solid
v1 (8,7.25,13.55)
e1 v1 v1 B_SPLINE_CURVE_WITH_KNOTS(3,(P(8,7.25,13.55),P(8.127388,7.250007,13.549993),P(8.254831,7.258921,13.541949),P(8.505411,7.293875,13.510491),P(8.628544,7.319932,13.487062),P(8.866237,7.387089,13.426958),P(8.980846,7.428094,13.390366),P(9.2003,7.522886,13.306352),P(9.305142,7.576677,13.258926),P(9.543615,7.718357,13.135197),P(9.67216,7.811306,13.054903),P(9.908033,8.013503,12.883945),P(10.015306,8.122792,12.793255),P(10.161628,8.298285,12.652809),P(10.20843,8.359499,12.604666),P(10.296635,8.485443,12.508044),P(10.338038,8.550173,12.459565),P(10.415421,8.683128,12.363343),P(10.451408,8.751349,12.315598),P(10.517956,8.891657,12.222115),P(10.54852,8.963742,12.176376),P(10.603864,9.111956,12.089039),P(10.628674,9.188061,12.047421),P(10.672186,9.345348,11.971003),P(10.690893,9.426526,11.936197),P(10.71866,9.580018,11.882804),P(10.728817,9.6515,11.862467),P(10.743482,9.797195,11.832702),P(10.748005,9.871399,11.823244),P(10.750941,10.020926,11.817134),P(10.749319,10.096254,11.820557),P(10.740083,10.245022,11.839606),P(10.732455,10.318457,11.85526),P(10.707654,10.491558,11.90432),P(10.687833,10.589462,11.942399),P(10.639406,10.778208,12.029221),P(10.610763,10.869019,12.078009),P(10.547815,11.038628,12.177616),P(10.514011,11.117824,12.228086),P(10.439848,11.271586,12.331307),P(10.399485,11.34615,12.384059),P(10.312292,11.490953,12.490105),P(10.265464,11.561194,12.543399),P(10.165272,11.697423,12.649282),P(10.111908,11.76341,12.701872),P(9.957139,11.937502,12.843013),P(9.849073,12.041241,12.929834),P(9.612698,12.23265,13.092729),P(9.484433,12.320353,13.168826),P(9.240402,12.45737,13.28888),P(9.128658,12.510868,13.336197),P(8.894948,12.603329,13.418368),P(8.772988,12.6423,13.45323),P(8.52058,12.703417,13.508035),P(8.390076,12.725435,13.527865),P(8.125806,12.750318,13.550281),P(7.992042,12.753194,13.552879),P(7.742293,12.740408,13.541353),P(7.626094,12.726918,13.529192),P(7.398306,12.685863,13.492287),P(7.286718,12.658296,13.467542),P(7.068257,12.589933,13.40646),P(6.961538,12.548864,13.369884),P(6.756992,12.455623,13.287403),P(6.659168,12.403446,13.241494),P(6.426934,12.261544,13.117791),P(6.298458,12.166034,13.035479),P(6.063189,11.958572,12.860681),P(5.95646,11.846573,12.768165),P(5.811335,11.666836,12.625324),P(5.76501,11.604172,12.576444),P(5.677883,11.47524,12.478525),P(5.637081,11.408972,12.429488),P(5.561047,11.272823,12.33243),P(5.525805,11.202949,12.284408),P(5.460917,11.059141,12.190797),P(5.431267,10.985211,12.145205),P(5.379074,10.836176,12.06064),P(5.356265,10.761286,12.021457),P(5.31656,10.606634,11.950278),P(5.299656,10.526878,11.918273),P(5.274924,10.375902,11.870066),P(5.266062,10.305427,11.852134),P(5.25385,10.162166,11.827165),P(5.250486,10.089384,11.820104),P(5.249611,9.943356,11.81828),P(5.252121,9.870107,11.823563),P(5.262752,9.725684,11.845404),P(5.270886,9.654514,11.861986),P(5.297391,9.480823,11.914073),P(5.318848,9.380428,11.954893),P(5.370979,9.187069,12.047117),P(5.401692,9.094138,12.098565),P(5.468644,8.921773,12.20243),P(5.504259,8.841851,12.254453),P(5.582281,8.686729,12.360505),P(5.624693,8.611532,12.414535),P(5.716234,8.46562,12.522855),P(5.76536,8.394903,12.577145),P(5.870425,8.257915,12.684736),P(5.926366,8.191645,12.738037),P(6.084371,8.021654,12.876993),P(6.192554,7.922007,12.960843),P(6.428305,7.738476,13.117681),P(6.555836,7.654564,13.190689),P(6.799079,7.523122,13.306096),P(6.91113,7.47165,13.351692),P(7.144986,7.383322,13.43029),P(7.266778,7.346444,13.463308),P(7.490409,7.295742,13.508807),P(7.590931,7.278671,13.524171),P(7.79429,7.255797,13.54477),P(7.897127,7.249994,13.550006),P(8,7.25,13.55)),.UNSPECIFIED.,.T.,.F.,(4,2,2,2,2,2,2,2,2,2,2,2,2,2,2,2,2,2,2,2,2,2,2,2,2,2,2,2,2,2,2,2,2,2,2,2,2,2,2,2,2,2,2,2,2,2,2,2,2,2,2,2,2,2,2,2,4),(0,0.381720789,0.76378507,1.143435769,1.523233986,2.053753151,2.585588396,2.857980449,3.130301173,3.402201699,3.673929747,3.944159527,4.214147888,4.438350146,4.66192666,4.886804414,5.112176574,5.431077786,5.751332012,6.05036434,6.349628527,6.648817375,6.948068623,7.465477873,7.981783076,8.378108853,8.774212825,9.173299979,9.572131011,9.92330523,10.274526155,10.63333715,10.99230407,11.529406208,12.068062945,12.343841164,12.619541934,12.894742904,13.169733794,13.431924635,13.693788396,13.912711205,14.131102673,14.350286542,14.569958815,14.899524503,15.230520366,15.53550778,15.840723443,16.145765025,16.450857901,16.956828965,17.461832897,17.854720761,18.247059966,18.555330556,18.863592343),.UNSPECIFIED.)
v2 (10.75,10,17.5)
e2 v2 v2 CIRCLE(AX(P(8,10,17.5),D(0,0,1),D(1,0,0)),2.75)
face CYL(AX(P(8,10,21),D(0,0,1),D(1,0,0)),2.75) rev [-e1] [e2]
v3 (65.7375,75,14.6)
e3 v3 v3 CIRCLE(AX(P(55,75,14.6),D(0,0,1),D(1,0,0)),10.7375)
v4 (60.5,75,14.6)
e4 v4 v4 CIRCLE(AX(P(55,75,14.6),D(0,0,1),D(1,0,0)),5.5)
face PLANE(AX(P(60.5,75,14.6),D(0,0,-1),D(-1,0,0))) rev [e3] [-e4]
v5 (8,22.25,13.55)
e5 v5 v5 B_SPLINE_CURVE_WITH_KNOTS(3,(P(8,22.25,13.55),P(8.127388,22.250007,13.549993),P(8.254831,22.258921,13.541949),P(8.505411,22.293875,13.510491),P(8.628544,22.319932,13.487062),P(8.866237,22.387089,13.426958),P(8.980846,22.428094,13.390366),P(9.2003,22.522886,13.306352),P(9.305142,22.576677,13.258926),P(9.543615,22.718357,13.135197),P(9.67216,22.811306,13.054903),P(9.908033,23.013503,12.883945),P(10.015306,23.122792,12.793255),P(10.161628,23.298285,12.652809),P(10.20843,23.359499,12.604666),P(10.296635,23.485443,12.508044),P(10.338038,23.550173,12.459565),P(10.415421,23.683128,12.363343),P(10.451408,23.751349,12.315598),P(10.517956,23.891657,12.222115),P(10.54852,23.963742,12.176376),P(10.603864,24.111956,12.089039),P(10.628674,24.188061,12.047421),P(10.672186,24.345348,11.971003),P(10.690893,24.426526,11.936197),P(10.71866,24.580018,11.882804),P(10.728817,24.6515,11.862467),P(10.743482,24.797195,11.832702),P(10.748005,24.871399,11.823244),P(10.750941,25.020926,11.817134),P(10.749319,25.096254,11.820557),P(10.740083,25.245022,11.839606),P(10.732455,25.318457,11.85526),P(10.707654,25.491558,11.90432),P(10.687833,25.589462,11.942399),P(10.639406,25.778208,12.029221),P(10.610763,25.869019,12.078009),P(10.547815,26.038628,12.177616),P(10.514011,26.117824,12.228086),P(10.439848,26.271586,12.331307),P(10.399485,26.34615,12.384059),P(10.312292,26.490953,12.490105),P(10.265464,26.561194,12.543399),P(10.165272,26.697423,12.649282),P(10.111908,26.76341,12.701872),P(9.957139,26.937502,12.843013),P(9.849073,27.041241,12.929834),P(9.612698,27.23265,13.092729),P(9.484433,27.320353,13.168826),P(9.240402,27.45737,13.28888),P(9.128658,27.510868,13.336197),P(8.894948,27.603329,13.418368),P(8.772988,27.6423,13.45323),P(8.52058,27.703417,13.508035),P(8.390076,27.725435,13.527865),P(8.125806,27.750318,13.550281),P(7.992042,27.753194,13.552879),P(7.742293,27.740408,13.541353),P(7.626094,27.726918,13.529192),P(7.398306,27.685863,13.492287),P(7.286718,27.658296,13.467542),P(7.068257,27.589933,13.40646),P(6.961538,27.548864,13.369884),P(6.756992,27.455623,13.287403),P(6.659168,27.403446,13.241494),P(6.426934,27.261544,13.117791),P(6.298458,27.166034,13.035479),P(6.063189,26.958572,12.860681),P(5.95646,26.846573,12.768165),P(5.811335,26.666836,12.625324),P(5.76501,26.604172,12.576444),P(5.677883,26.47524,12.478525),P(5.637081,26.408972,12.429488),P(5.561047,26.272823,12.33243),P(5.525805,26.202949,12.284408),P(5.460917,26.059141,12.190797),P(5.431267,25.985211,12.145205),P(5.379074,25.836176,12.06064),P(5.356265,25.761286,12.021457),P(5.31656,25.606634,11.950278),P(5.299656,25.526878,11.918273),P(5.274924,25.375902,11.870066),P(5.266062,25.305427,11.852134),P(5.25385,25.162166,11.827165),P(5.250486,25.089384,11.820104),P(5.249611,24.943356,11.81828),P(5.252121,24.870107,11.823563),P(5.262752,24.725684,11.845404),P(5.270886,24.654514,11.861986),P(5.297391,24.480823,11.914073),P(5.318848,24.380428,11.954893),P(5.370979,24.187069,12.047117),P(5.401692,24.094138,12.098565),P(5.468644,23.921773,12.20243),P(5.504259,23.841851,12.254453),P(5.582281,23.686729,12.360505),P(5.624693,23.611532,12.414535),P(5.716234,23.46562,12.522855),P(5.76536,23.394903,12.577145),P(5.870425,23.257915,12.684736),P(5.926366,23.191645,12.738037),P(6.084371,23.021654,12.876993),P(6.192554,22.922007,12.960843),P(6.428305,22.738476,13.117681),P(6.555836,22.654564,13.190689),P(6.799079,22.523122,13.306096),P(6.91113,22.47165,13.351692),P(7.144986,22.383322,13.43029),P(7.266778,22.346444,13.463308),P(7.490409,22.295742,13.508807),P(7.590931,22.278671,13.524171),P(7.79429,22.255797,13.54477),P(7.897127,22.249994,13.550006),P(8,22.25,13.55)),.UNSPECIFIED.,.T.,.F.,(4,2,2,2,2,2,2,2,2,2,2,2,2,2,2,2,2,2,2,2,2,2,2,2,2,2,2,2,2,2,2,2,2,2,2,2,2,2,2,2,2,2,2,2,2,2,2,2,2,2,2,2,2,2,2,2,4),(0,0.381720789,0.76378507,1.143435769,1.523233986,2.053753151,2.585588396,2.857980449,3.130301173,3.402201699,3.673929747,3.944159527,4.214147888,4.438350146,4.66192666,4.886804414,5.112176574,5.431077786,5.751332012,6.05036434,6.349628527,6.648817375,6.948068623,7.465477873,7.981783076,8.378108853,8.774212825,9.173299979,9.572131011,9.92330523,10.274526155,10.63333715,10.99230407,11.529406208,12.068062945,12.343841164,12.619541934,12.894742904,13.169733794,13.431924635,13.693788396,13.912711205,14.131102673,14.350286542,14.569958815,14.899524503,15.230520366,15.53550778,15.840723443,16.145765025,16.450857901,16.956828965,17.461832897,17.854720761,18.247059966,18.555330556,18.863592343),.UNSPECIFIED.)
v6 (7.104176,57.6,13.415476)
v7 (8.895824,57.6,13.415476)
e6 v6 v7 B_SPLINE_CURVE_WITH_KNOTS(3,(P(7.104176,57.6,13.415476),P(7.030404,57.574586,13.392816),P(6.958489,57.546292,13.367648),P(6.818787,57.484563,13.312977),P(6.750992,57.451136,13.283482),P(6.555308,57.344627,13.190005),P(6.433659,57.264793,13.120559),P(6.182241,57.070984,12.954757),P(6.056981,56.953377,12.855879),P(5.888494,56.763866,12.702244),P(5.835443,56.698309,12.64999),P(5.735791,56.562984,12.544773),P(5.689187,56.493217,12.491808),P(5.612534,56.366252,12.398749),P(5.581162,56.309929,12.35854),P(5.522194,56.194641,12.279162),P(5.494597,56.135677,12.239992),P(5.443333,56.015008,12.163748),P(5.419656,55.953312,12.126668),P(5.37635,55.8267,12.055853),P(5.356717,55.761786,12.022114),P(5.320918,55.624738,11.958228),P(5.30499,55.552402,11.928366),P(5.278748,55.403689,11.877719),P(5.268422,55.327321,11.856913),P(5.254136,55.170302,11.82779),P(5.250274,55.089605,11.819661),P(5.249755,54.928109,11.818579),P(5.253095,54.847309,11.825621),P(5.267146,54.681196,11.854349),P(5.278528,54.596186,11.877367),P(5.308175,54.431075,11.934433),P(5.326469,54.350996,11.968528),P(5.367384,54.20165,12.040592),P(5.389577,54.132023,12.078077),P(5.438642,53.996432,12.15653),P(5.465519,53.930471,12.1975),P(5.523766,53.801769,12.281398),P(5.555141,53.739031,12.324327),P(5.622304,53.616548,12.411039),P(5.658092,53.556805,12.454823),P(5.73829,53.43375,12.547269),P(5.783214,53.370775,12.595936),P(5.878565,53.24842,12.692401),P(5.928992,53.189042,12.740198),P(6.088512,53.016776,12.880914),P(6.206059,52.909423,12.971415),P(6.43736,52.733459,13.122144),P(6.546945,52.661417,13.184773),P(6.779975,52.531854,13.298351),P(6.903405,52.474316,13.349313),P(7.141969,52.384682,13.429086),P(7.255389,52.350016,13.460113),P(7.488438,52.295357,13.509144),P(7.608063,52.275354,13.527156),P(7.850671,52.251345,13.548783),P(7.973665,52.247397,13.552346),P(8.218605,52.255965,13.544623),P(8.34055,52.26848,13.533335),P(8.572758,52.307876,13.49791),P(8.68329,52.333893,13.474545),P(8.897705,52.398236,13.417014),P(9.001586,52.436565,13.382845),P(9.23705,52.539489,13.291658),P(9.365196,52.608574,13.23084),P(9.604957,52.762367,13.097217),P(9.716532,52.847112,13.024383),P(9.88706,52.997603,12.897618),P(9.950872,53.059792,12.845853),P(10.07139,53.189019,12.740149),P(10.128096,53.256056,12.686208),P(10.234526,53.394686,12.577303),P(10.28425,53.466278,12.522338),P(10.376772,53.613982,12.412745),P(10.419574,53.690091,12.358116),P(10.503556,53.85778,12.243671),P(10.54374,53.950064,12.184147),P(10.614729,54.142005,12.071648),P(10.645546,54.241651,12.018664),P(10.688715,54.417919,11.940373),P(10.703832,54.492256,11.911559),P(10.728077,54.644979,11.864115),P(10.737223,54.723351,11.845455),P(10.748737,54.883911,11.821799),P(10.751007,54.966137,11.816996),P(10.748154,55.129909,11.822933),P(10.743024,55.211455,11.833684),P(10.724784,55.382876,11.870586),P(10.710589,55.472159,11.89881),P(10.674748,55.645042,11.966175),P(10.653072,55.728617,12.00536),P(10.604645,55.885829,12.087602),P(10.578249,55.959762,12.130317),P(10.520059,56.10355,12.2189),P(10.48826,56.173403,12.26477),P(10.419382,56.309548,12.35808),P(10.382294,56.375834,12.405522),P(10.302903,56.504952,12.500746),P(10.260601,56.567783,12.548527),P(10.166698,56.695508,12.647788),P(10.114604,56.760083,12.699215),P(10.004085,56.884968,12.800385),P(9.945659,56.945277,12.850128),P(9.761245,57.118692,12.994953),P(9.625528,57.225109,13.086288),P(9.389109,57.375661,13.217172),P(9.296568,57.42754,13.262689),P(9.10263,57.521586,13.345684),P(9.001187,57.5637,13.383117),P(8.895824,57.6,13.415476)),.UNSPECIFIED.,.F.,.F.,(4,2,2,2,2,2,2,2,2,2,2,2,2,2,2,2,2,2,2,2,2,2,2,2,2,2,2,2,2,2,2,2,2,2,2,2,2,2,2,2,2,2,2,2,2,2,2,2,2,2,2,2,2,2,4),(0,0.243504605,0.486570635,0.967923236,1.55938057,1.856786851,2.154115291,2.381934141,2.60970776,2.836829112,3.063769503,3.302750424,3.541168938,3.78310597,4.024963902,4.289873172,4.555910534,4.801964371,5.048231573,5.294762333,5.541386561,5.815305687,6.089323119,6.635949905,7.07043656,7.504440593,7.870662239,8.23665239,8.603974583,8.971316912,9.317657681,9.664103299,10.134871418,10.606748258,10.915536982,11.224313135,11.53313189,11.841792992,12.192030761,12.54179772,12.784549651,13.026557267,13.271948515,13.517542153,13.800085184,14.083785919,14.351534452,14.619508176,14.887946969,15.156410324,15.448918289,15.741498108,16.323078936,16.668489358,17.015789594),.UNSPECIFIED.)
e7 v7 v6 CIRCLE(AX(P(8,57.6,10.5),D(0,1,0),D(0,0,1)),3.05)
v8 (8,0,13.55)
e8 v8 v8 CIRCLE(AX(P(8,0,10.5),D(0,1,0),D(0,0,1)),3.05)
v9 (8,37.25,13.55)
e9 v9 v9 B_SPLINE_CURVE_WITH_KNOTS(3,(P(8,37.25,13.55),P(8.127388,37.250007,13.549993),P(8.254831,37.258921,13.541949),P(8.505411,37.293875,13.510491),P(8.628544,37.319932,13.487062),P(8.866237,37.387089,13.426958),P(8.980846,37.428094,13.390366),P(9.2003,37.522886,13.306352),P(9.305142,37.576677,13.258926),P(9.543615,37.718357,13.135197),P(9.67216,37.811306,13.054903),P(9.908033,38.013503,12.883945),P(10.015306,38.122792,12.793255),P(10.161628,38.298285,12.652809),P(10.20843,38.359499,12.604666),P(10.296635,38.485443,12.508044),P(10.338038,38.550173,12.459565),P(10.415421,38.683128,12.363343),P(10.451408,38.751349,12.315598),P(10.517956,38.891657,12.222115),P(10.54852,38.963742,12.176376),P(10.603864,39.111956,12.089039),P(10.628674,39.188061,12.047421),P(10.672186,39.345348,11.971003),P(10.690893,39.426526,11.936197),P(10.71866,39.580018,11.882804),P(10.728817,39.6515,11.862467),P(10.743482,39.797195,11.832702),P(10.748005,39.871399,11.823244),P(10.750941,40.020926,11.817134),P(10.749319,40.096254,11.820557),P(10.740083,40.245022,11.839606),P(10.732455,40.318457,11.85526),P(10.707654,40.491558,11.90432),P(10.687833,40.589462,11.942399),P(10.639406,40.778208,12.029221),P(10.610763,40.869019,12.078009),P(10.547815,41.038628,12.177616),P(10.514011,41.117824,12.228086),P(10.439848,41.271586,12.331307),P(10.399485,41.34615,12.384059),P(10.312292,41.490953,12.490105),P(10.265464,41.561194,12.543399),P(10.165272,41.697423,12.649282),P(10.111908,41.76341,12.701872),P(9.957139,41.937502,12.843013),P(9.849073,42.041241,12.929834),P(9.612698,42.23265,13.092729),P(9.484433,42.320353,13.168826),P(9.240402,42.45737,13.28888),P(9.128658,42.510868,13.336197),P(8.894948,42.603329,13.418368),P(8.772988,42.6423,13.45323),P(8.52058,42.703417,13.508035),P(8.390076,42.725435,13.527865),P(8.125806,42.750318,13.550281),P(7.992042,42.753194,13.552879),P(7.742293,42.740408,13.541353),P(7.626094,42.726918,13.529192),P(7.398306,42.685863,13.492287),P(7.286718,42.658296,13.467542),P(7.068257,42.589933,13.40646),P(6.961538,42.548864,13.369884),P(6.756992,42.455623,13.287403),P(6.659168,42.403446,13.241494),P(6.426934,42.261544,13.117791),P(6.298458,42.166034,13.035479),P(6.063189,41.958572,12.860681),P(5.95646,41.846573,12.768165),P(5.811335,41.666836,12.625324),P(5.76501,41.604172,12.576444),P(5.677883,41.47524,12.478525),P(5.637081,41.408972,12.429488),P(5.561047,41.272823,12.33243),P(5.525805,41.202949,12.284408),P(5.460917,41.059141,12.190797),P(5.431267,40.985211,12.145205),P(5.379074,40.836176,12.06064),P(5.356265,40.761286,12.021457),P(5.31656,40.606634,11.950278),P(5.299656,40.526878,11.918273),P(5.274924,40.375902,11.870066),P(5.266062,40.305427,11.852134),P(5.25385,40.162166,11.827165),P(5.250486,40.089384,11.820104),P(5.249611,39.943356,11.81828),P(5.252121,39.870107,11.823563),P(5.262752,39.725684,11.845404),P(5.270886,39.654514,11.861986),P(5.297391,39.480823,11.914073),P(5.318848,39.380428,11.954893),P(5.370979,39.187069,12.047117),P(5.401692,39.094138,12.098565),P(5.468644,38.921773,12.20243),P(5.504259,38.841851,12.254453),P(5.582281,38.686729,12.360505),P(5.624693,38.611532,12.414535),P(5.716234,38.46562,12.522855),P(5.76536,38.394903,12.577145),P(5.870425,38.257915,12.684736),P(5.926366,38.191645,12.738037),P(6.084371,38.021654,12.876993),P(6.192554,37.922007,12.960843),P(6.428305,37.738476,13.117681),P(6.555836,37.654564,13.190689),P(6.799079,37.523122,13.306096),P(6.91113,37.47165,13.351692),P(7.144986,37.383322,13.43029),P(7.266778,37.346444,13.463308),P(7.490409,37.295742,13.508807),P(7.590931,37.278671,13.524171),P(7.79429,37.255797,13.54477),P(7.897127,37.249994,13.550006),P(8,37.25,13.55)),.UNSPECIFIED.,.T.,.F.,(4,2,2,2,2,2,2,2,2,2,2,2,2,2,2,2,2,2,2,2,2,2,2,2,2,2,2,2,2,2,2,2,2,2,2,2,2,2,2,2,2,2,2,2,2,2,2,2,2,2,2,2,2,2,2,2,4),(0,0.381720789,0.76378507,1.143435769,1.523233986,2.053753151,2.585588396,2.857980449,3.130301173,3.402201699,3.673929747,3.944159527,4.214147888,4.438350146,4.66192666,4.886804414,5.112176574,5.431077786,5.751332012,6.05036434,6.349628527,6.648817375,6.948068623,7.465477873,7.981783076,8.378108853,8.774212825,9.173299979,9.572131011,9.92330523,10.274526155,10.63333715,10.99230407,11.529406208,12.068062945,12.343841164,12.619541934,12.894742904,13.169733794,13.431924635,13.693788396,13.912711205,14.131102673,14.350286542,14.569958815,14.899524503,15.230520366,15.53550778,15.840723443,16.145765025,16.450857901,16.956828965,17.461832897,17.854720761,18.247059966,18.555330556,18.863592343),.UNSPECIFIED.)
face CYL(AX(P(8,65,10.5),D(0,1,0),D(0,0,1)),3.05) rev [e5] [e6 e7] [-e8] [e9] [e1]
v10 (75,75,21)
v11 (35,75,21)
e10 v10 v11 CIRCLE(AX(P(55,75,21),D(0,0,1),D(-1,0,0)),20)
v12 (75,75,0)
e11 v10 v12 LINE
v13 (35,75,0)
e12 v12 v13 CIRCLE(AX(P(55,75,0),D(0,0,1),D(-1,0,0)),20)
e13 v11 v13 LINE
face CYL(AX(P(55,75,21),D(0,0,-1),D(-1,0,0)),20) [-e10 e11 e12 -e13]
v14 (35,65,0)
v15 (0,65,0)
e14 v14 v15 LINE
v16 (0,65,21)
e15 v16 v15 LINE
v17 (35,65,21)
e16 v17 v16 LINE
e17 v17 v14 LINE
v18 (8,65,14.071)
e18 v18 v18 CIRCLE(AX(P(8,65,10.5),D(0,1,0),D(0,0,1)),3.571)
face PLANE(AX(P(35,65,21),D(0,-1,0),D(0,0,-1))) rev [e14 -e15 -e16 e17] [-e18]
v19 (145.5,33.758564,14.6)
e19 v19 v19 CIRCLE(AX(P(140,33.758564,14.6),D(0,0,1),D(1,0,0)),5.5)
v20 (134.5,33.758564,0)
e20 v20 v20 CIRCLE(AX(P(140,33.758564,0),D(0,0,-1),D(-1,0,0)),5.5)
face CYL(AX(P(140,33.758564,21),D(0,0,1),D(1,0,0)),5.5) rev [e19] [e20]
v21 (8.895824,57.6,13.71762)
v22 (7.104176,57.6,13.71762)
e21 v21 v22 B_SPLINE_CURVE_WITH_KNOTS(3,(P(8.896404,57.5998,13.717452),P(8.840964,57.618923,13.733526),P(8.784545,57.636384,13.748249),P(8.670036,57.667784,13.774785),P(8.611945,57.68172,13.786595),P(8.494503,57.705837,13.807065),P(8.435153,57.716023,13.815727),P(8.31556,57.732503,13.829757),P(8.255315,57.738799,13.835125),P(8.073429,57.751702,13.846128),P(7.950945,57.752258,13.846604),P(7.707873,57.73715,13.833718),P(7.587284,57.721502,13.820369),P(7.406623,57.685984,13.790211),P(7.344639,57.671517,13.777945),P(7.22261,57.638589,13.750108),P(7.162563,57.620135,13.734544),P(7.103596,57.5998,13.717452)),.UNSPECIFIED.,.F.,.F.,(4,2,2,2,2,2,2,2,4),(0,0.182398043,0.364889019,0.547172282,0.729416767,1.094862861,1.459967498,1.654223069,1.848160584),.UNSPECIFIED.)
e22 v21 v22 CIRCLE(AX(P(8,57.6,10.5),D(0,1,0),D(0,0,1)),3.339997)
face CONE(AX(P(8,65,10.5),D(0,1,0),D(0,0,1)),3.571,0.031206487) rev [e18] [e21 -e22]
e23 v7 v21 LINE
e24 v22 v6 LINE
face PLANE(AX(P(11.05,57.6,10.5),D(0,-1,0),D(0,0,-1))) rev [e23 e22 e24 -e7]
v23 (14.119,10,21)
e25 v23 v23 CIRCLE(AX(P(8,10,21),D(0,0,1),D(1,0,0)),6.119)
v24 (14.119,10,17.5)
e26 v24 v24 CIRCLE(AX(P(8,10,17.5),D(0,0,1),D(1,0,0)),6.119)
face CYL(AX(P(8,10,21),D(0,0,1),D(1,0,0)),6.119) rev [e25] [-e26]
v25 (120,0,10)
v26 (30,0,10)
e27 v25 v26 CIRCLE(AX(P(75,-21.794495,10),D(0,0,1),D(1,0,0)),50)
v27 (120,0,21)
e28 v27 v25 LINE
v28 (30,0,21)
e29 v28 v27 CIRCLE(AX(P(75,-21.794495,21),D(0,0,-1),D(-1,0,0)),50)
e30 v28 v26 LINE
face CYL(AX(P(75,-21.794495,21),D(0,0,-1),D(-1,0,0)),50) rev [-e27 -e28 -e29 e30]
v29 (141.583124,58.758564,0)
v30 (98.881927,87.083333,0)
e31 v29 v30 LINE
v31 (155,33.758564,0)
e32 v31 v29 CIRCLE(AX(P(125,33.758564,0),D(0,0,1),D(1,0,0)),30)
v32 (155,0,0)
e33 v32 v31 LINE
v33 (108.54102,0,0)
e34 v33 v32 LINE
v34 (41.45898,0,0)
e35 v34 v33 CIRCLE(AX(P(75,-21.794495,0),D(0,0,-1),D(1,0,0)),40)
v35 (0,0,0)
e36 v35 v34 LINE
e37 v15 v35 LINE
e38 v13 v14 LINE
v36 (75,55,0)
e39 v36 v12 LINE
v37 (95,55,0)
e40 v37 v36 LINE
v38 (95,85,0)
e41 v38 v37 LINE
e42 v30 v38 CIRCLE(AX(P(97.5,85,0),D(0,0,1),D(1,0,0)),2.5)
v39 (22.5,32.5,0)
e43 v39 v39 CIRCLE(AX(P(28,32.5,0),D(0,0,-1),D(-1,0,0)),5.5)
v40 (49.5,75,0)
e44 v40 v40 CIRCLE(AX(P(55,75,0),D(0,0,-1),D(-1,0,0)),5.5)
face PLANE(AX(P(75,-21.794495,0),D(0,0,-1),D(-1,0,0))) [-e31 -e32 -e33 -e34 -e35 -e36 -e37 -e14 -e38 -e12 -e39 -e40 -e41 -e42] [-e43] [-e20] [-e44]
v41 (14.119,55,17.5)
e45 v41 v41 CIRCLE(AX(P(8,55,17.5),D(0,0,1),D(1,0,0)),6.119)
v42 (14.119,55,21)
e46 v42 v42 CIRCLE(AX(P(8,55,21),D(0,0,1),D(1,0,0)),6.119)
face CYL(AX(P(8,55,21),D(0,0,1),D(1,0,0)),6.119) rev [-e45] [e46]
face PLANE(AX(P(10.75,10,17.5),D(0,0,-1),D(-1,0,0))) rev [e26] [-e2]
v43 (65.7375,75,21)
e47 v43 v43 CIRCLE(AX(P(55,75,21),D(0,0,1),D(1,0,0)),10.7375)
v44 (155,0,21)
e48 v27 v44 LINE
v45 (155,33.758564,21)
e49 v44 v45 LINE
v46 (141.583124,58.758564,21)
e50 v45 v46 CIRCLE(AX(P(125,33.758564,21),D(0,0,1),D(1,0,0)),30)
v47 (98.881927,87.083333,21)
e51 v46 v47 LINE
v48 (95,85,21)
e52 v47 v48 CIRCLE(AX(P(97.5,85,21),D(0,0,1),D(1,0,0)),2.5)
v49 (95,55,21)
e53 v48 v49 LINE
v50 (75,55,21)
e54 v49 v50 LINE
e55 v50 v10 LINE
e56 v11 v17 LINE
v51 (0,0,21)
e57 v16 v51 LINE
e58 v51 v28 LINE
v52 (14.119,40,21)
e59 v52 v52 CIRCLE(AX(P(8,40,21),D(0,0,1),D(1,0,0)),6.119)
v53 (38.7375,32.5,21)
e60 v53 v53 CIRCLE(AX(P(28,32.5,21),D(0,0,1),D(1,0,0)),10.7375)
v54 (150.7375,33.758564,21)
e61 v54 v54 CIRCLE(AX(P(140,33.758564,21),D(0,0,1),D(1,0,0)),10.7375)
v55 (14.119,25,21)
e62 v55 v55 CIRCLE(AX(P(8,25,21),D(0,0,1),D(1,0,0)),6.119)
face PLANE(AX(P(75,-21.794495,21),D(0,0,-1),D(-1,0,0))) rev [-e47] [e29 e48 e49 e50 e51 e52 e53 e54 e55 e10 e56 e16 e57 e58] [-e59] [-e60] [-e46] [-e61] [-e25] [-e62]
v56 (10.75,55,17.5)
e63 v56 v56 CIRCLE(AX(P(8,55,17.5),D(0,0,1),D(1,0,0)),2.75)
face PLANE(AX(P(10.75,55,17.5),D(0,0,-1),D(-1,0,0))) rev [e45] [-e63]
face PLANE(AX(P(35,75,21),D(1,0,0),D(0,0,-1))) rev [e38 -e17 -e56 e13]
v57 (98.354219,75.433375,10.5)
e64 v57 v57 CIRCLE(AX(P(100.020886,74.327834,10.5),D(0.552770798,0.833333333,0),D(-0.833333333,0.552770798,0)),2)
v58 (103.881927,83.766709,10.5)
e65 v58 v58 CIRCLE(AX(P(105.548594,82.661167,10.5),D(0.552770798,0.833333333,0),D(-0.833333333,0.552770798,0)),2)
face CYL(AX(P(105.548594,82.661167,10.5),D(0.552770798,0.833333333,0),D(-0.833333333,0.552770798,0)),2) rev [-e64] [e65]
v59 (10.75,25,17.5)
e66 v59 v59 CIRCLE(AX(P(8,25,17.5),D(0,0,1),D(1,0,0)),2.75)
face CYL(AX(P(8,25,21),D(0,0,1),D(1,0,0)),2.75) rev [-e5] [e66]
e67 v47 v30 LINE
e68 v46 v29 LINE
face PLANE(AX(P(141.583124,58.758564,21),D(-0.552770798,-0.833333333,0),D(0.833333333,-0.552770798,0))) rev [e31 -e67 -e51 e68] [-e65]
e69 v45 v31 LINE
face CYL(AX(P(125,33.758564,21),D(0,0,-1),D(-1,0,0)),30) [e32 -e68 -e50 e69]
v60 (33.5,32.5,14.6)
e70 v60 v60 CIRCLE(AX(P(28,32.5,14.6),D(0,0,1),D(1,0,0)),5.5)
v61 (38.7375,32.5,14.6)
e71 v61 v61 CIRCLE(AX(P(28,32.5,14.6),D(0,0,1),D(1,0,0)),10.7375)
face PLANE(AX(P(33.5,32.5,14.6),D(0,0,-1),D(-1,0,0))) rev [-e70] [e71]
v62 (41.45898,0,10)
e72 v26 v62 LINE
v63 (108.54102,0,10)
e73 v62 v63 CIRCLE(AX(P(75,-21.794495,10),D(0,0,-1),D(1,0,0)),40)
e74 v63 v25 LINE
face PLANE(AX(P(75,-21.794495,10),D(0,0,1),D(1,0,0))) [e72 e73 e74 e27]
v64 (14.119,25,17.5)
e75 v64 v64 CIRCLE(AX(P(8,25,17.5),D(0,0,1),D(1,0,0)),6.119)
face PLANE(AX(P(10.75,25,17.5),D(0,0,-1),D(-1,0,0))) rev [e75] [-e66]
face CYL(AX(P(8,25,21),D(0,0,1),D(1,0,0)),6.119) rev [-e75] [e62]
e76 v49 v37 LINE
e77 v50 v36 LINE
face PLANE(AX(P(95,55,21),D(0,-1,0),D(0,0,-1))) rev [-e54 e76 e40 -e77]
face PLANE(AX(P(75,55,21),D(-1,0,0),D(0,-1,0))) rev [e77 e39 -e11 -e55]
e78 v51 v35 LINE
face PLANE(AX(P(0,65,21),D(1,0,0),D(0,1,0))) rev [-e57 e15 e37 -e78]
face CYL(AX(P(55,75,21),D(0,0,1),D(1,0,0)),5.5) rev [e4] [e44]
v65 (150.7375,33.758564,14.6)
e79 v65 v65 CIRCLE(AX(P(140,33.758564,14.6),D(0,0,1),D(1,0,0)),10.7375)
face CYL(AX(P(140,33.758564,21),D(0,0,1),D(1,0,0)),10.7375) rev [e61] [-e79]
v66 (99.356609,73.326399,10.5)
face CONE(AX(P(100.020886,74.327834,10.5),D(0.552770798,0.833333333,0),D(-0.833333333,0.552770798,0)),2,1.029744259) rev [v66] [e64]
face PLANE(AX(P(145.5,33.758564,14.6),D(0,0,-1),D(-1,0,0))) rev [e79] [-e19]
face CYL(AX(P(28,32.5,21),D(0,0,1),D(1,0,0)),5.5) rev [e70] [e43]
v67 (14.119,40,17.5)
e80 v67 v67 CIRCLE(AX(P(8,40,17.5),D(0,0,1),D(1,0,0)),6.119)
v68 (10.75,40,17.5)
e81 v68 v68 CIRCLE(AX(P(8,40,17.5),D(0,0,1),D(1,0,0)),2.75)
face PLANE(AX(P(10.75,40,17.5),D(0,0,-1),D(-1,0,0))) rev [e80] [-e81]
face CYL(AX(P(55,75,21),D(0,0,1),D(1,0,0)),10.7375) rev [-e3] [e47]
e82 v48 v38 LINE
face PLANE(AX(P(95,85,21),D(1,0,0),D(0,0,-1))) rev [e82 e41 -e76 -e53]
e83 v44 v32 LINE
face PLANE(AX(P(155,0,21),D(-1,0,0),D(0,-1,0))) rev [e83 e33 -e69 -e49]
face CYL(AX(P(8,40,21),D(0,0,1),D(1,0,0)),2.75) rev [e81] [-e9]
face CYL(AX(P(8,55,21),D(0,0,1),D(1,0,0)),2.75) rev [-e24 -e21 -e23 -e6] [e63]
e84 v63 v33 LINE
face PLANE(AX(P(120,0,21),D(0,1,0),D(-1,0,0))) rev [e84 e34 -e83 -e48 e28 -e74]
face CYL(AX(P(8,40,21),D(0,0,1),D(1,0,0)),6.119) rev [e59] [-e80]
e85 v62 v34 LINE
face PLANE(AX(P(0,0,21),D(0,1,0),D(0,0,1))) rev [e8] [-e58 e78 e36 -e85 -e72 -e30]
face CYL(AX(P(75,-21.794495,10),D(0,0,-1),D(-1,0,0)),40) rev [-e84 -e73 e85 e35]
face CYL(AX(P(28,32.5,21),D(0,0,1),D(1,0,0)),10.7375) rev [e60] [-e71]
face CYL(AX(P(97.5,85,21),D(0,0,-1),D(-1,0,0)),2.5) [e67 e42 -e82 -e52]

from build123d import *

# Parameters (mm, degrees)
BOSS_EXTRUDE1_DEPTH                      = 21
BOSS_EXTRUDE2_DEPTH                      = 10
CBORE_START                              = 17.5
CBORE_FOR_M5_HEX_HEAD_BOLT1_OUTLINE_R    = 6.119
CBORE_FOR_M5_HEX_HEAD_BOLT1_DEPTH        = 3.5
CBORE_START_2                            = 11.819091173
CBORE_FOR_M5_HEX_HEAD_BOLT1_2_OUTLINE_R  = 2.75
CBORE_FOR_M5_HEX_HEAD_BOLT1_2_DEPTH      = 5.680908827
CBORE_FOR_M10_HEX_HEAD_BOLT1_D           = 11
CBORE_FOR_M10_HEX_HEAD_BOLT1_CBORE_D     = 21.475
CBORE_FOR_M10_HEX_HEAD_BOLT1_CBORE_DEPTH = 6.4
F_4_0MM_DOWEL_HOLE1_D                    = 4
F_4_0MM_DOWEL_HOLE1_DEPTH                = 10
F_4_0MM_DOWEL_HOLE1_TIP                  = 1.201721238


# Read off the part's stored shape, not the designer's step: CBORE for M5 Hex Head Bolt1
with BuildPart() as part:
    # Sketch1 → Boss-Extrude1 (new body)
    with BuildSketch(Plane.XY):
        with BuildLine():
            Line((35, 65), (0, 65))
            Line((0, 65), (0, 0))
            Line((0, 0), (30, 0))
            ThreePointArc((30, 0), (75, 28.205505282), (120, 0))
            Line((120, 0), (155, 0))
            Line((155, 0), (155, 33.758563653))
            ThreePointArc((155, 33.758563653), (151.433820369, 47.944935308), (141.583123952, 58.758563653))
            Line((141.583123952, 58.758563653), (98.881926996, 87.083333333))
            ThreePointArc((98.881926996, 87.083333333), (96.317802362, 87.202818364), (95, 85))
            Line((95, 85), (95, 55))
            Line((95, 55), (75, 55))
            Line((75, 55), (75, 75))
            ThreePointArc((75, 75), (55, 95), (35, 75))
            Line((35, 75), (35, 65))
        make_face()
    extrude(amount=BOSS_EXTRUDE1_DEPTH)

    # Sketch2 → Boss-Extrude2 (add)
    with BuildSketch(Plane.XY):
        with BuildLine():
            Line((30, 0), (41.458980338, 0))
            ThreePointArc((41.458980338, 0), (75, 18.205505282), (108.541019662, 0))
            Line((108.541019662, 0), (120, 0))
            ThreePointArc((120, 0), (75, 28.205505282), (30, 0))
        make_face()
    extrude(amount=BOSS_EXTRUDE2_DEPTH)

    # Sketch16 → 1/16 Rc Tapped Hole1 (revolve, cut)
    with BuildSketch(Plane(origin=(8, 65, 10.5), x_dir=(0, 0, 1), z_dir=(1, 0, 0))):
        Polygon((0, 0), (0, 65), (3.05, 65), (3.05, 7.4), (3.339997004, 7.4), (3.571, 0), align=None)
    revolve(axis=Axis((8, 71.35, 10.5), (0, -1, 0)), mode=Mode.SUBTRACT)

    # CBORE for M5 Hex Head Bolt1 outline → CBORE for M5 Hex Head Bolt1 (cut)
    with BuildSketch(Plane.XY.offset(CBORE_START)):
        with Locations((8, 10)):
            Circle(CBORE_FOR_M5_HEX_HEAD_BOLT1_OUTLINE_R)
        with Locations((8, 25)):
            Circle(CBORE_FOR_M5_HEX_HEAD_BOLT1_OUTLINE_R)
        with Locations((8, 40)):
            Circle(CBORE_FOR_M5_HEX_HEAD_BOLT1_OUTLINE_R)
        with Locations((8, 55)):
            Circle(CBORE_FOR_M5_HEX_HEAD_BOLT1_OUTLINE_R)
    extrude(amount=CBORE_FOR_M5_HEX_HEAD_BOLT1_DEPTH, mode=Mode.SUBTRACT)

    # CBORE for M5 Hex Head Bolt1 2 outline → CBORE for M5 Hex Head Bolt1 2 (cut)
    with BuildSketch(Plane.XY.offset(CBORE_START_2)):
        with Locations((8, 10)):
            Circle(CBORE_FOR_M5_HEX_HEAD_BOLT1_2_OUTLINE_R)
        with Locations((8, 25)):
            Circle(CBORE_FOR_M5_HEX_HEAD_BOLT1_2_OUTLINE_R)
        with Locations((8, 40)):
            Circle(CBORE_FOR_M5_HEX_HEAD_BOLT1_2_OUTLINE_R)
        with Locations((8, 55)):
            Circle(CBORE_FOR_M5_HEX_HEAD_BOLT1_2_OUTLINE_R)
    extrude(amount=CBORE_FOR_M5_HEX_HEAD_BOLT1_2_DEPTH, mode=Mode.SUBTRACT)

    # CBORE for M10 Hex Head Bolt1 (through all)
    with Locations(Plane.XY.offset(21)):
        with Locations((28, 32.5), (55, 75), (140, 33.758563653)):
            CounterBoreHole(CBORE_FOR_M10_HEX_HEAD_BOLT1_D / 2, CBORE_FOR_M10_HEX_HEAD_BOLT1_CBORE_D / 2, CBORE_FOR_M10_HEX_HEAD_BOLT1_CBORE_DEPTH)

    # Ø4.0mm Dowel Hole1
    with Locations(Plane(origin=(70.328191882, 106.023738481, 0), x_dir=(0.8333333333333334, -0.5527707983925666, 0), z_dir=(0.5527707983925666, 0.8333333333333334, 0))):
        with Locations((42.264482137, -10.5)):
            Hole(F_4_0MM_DOWEL_HOLE1_D / 2, depth=F_4_0MM_DOWEL_HOLE1_DEPTH)
            with Locations((0, 0, -(F_4_0MM_DOWEL_HOLE1_DEPTH + F_4_0MM_DOWEL_HOLE1_TIP / 2))):  # 118° drill point
                Cone(0, F_4_0MM_DOWEL_HOLE1_D / 2, F_4_0MM_DOWEL_HOLE1_TIP, mode=Mode.SUBTRACT)


solid = part.part
